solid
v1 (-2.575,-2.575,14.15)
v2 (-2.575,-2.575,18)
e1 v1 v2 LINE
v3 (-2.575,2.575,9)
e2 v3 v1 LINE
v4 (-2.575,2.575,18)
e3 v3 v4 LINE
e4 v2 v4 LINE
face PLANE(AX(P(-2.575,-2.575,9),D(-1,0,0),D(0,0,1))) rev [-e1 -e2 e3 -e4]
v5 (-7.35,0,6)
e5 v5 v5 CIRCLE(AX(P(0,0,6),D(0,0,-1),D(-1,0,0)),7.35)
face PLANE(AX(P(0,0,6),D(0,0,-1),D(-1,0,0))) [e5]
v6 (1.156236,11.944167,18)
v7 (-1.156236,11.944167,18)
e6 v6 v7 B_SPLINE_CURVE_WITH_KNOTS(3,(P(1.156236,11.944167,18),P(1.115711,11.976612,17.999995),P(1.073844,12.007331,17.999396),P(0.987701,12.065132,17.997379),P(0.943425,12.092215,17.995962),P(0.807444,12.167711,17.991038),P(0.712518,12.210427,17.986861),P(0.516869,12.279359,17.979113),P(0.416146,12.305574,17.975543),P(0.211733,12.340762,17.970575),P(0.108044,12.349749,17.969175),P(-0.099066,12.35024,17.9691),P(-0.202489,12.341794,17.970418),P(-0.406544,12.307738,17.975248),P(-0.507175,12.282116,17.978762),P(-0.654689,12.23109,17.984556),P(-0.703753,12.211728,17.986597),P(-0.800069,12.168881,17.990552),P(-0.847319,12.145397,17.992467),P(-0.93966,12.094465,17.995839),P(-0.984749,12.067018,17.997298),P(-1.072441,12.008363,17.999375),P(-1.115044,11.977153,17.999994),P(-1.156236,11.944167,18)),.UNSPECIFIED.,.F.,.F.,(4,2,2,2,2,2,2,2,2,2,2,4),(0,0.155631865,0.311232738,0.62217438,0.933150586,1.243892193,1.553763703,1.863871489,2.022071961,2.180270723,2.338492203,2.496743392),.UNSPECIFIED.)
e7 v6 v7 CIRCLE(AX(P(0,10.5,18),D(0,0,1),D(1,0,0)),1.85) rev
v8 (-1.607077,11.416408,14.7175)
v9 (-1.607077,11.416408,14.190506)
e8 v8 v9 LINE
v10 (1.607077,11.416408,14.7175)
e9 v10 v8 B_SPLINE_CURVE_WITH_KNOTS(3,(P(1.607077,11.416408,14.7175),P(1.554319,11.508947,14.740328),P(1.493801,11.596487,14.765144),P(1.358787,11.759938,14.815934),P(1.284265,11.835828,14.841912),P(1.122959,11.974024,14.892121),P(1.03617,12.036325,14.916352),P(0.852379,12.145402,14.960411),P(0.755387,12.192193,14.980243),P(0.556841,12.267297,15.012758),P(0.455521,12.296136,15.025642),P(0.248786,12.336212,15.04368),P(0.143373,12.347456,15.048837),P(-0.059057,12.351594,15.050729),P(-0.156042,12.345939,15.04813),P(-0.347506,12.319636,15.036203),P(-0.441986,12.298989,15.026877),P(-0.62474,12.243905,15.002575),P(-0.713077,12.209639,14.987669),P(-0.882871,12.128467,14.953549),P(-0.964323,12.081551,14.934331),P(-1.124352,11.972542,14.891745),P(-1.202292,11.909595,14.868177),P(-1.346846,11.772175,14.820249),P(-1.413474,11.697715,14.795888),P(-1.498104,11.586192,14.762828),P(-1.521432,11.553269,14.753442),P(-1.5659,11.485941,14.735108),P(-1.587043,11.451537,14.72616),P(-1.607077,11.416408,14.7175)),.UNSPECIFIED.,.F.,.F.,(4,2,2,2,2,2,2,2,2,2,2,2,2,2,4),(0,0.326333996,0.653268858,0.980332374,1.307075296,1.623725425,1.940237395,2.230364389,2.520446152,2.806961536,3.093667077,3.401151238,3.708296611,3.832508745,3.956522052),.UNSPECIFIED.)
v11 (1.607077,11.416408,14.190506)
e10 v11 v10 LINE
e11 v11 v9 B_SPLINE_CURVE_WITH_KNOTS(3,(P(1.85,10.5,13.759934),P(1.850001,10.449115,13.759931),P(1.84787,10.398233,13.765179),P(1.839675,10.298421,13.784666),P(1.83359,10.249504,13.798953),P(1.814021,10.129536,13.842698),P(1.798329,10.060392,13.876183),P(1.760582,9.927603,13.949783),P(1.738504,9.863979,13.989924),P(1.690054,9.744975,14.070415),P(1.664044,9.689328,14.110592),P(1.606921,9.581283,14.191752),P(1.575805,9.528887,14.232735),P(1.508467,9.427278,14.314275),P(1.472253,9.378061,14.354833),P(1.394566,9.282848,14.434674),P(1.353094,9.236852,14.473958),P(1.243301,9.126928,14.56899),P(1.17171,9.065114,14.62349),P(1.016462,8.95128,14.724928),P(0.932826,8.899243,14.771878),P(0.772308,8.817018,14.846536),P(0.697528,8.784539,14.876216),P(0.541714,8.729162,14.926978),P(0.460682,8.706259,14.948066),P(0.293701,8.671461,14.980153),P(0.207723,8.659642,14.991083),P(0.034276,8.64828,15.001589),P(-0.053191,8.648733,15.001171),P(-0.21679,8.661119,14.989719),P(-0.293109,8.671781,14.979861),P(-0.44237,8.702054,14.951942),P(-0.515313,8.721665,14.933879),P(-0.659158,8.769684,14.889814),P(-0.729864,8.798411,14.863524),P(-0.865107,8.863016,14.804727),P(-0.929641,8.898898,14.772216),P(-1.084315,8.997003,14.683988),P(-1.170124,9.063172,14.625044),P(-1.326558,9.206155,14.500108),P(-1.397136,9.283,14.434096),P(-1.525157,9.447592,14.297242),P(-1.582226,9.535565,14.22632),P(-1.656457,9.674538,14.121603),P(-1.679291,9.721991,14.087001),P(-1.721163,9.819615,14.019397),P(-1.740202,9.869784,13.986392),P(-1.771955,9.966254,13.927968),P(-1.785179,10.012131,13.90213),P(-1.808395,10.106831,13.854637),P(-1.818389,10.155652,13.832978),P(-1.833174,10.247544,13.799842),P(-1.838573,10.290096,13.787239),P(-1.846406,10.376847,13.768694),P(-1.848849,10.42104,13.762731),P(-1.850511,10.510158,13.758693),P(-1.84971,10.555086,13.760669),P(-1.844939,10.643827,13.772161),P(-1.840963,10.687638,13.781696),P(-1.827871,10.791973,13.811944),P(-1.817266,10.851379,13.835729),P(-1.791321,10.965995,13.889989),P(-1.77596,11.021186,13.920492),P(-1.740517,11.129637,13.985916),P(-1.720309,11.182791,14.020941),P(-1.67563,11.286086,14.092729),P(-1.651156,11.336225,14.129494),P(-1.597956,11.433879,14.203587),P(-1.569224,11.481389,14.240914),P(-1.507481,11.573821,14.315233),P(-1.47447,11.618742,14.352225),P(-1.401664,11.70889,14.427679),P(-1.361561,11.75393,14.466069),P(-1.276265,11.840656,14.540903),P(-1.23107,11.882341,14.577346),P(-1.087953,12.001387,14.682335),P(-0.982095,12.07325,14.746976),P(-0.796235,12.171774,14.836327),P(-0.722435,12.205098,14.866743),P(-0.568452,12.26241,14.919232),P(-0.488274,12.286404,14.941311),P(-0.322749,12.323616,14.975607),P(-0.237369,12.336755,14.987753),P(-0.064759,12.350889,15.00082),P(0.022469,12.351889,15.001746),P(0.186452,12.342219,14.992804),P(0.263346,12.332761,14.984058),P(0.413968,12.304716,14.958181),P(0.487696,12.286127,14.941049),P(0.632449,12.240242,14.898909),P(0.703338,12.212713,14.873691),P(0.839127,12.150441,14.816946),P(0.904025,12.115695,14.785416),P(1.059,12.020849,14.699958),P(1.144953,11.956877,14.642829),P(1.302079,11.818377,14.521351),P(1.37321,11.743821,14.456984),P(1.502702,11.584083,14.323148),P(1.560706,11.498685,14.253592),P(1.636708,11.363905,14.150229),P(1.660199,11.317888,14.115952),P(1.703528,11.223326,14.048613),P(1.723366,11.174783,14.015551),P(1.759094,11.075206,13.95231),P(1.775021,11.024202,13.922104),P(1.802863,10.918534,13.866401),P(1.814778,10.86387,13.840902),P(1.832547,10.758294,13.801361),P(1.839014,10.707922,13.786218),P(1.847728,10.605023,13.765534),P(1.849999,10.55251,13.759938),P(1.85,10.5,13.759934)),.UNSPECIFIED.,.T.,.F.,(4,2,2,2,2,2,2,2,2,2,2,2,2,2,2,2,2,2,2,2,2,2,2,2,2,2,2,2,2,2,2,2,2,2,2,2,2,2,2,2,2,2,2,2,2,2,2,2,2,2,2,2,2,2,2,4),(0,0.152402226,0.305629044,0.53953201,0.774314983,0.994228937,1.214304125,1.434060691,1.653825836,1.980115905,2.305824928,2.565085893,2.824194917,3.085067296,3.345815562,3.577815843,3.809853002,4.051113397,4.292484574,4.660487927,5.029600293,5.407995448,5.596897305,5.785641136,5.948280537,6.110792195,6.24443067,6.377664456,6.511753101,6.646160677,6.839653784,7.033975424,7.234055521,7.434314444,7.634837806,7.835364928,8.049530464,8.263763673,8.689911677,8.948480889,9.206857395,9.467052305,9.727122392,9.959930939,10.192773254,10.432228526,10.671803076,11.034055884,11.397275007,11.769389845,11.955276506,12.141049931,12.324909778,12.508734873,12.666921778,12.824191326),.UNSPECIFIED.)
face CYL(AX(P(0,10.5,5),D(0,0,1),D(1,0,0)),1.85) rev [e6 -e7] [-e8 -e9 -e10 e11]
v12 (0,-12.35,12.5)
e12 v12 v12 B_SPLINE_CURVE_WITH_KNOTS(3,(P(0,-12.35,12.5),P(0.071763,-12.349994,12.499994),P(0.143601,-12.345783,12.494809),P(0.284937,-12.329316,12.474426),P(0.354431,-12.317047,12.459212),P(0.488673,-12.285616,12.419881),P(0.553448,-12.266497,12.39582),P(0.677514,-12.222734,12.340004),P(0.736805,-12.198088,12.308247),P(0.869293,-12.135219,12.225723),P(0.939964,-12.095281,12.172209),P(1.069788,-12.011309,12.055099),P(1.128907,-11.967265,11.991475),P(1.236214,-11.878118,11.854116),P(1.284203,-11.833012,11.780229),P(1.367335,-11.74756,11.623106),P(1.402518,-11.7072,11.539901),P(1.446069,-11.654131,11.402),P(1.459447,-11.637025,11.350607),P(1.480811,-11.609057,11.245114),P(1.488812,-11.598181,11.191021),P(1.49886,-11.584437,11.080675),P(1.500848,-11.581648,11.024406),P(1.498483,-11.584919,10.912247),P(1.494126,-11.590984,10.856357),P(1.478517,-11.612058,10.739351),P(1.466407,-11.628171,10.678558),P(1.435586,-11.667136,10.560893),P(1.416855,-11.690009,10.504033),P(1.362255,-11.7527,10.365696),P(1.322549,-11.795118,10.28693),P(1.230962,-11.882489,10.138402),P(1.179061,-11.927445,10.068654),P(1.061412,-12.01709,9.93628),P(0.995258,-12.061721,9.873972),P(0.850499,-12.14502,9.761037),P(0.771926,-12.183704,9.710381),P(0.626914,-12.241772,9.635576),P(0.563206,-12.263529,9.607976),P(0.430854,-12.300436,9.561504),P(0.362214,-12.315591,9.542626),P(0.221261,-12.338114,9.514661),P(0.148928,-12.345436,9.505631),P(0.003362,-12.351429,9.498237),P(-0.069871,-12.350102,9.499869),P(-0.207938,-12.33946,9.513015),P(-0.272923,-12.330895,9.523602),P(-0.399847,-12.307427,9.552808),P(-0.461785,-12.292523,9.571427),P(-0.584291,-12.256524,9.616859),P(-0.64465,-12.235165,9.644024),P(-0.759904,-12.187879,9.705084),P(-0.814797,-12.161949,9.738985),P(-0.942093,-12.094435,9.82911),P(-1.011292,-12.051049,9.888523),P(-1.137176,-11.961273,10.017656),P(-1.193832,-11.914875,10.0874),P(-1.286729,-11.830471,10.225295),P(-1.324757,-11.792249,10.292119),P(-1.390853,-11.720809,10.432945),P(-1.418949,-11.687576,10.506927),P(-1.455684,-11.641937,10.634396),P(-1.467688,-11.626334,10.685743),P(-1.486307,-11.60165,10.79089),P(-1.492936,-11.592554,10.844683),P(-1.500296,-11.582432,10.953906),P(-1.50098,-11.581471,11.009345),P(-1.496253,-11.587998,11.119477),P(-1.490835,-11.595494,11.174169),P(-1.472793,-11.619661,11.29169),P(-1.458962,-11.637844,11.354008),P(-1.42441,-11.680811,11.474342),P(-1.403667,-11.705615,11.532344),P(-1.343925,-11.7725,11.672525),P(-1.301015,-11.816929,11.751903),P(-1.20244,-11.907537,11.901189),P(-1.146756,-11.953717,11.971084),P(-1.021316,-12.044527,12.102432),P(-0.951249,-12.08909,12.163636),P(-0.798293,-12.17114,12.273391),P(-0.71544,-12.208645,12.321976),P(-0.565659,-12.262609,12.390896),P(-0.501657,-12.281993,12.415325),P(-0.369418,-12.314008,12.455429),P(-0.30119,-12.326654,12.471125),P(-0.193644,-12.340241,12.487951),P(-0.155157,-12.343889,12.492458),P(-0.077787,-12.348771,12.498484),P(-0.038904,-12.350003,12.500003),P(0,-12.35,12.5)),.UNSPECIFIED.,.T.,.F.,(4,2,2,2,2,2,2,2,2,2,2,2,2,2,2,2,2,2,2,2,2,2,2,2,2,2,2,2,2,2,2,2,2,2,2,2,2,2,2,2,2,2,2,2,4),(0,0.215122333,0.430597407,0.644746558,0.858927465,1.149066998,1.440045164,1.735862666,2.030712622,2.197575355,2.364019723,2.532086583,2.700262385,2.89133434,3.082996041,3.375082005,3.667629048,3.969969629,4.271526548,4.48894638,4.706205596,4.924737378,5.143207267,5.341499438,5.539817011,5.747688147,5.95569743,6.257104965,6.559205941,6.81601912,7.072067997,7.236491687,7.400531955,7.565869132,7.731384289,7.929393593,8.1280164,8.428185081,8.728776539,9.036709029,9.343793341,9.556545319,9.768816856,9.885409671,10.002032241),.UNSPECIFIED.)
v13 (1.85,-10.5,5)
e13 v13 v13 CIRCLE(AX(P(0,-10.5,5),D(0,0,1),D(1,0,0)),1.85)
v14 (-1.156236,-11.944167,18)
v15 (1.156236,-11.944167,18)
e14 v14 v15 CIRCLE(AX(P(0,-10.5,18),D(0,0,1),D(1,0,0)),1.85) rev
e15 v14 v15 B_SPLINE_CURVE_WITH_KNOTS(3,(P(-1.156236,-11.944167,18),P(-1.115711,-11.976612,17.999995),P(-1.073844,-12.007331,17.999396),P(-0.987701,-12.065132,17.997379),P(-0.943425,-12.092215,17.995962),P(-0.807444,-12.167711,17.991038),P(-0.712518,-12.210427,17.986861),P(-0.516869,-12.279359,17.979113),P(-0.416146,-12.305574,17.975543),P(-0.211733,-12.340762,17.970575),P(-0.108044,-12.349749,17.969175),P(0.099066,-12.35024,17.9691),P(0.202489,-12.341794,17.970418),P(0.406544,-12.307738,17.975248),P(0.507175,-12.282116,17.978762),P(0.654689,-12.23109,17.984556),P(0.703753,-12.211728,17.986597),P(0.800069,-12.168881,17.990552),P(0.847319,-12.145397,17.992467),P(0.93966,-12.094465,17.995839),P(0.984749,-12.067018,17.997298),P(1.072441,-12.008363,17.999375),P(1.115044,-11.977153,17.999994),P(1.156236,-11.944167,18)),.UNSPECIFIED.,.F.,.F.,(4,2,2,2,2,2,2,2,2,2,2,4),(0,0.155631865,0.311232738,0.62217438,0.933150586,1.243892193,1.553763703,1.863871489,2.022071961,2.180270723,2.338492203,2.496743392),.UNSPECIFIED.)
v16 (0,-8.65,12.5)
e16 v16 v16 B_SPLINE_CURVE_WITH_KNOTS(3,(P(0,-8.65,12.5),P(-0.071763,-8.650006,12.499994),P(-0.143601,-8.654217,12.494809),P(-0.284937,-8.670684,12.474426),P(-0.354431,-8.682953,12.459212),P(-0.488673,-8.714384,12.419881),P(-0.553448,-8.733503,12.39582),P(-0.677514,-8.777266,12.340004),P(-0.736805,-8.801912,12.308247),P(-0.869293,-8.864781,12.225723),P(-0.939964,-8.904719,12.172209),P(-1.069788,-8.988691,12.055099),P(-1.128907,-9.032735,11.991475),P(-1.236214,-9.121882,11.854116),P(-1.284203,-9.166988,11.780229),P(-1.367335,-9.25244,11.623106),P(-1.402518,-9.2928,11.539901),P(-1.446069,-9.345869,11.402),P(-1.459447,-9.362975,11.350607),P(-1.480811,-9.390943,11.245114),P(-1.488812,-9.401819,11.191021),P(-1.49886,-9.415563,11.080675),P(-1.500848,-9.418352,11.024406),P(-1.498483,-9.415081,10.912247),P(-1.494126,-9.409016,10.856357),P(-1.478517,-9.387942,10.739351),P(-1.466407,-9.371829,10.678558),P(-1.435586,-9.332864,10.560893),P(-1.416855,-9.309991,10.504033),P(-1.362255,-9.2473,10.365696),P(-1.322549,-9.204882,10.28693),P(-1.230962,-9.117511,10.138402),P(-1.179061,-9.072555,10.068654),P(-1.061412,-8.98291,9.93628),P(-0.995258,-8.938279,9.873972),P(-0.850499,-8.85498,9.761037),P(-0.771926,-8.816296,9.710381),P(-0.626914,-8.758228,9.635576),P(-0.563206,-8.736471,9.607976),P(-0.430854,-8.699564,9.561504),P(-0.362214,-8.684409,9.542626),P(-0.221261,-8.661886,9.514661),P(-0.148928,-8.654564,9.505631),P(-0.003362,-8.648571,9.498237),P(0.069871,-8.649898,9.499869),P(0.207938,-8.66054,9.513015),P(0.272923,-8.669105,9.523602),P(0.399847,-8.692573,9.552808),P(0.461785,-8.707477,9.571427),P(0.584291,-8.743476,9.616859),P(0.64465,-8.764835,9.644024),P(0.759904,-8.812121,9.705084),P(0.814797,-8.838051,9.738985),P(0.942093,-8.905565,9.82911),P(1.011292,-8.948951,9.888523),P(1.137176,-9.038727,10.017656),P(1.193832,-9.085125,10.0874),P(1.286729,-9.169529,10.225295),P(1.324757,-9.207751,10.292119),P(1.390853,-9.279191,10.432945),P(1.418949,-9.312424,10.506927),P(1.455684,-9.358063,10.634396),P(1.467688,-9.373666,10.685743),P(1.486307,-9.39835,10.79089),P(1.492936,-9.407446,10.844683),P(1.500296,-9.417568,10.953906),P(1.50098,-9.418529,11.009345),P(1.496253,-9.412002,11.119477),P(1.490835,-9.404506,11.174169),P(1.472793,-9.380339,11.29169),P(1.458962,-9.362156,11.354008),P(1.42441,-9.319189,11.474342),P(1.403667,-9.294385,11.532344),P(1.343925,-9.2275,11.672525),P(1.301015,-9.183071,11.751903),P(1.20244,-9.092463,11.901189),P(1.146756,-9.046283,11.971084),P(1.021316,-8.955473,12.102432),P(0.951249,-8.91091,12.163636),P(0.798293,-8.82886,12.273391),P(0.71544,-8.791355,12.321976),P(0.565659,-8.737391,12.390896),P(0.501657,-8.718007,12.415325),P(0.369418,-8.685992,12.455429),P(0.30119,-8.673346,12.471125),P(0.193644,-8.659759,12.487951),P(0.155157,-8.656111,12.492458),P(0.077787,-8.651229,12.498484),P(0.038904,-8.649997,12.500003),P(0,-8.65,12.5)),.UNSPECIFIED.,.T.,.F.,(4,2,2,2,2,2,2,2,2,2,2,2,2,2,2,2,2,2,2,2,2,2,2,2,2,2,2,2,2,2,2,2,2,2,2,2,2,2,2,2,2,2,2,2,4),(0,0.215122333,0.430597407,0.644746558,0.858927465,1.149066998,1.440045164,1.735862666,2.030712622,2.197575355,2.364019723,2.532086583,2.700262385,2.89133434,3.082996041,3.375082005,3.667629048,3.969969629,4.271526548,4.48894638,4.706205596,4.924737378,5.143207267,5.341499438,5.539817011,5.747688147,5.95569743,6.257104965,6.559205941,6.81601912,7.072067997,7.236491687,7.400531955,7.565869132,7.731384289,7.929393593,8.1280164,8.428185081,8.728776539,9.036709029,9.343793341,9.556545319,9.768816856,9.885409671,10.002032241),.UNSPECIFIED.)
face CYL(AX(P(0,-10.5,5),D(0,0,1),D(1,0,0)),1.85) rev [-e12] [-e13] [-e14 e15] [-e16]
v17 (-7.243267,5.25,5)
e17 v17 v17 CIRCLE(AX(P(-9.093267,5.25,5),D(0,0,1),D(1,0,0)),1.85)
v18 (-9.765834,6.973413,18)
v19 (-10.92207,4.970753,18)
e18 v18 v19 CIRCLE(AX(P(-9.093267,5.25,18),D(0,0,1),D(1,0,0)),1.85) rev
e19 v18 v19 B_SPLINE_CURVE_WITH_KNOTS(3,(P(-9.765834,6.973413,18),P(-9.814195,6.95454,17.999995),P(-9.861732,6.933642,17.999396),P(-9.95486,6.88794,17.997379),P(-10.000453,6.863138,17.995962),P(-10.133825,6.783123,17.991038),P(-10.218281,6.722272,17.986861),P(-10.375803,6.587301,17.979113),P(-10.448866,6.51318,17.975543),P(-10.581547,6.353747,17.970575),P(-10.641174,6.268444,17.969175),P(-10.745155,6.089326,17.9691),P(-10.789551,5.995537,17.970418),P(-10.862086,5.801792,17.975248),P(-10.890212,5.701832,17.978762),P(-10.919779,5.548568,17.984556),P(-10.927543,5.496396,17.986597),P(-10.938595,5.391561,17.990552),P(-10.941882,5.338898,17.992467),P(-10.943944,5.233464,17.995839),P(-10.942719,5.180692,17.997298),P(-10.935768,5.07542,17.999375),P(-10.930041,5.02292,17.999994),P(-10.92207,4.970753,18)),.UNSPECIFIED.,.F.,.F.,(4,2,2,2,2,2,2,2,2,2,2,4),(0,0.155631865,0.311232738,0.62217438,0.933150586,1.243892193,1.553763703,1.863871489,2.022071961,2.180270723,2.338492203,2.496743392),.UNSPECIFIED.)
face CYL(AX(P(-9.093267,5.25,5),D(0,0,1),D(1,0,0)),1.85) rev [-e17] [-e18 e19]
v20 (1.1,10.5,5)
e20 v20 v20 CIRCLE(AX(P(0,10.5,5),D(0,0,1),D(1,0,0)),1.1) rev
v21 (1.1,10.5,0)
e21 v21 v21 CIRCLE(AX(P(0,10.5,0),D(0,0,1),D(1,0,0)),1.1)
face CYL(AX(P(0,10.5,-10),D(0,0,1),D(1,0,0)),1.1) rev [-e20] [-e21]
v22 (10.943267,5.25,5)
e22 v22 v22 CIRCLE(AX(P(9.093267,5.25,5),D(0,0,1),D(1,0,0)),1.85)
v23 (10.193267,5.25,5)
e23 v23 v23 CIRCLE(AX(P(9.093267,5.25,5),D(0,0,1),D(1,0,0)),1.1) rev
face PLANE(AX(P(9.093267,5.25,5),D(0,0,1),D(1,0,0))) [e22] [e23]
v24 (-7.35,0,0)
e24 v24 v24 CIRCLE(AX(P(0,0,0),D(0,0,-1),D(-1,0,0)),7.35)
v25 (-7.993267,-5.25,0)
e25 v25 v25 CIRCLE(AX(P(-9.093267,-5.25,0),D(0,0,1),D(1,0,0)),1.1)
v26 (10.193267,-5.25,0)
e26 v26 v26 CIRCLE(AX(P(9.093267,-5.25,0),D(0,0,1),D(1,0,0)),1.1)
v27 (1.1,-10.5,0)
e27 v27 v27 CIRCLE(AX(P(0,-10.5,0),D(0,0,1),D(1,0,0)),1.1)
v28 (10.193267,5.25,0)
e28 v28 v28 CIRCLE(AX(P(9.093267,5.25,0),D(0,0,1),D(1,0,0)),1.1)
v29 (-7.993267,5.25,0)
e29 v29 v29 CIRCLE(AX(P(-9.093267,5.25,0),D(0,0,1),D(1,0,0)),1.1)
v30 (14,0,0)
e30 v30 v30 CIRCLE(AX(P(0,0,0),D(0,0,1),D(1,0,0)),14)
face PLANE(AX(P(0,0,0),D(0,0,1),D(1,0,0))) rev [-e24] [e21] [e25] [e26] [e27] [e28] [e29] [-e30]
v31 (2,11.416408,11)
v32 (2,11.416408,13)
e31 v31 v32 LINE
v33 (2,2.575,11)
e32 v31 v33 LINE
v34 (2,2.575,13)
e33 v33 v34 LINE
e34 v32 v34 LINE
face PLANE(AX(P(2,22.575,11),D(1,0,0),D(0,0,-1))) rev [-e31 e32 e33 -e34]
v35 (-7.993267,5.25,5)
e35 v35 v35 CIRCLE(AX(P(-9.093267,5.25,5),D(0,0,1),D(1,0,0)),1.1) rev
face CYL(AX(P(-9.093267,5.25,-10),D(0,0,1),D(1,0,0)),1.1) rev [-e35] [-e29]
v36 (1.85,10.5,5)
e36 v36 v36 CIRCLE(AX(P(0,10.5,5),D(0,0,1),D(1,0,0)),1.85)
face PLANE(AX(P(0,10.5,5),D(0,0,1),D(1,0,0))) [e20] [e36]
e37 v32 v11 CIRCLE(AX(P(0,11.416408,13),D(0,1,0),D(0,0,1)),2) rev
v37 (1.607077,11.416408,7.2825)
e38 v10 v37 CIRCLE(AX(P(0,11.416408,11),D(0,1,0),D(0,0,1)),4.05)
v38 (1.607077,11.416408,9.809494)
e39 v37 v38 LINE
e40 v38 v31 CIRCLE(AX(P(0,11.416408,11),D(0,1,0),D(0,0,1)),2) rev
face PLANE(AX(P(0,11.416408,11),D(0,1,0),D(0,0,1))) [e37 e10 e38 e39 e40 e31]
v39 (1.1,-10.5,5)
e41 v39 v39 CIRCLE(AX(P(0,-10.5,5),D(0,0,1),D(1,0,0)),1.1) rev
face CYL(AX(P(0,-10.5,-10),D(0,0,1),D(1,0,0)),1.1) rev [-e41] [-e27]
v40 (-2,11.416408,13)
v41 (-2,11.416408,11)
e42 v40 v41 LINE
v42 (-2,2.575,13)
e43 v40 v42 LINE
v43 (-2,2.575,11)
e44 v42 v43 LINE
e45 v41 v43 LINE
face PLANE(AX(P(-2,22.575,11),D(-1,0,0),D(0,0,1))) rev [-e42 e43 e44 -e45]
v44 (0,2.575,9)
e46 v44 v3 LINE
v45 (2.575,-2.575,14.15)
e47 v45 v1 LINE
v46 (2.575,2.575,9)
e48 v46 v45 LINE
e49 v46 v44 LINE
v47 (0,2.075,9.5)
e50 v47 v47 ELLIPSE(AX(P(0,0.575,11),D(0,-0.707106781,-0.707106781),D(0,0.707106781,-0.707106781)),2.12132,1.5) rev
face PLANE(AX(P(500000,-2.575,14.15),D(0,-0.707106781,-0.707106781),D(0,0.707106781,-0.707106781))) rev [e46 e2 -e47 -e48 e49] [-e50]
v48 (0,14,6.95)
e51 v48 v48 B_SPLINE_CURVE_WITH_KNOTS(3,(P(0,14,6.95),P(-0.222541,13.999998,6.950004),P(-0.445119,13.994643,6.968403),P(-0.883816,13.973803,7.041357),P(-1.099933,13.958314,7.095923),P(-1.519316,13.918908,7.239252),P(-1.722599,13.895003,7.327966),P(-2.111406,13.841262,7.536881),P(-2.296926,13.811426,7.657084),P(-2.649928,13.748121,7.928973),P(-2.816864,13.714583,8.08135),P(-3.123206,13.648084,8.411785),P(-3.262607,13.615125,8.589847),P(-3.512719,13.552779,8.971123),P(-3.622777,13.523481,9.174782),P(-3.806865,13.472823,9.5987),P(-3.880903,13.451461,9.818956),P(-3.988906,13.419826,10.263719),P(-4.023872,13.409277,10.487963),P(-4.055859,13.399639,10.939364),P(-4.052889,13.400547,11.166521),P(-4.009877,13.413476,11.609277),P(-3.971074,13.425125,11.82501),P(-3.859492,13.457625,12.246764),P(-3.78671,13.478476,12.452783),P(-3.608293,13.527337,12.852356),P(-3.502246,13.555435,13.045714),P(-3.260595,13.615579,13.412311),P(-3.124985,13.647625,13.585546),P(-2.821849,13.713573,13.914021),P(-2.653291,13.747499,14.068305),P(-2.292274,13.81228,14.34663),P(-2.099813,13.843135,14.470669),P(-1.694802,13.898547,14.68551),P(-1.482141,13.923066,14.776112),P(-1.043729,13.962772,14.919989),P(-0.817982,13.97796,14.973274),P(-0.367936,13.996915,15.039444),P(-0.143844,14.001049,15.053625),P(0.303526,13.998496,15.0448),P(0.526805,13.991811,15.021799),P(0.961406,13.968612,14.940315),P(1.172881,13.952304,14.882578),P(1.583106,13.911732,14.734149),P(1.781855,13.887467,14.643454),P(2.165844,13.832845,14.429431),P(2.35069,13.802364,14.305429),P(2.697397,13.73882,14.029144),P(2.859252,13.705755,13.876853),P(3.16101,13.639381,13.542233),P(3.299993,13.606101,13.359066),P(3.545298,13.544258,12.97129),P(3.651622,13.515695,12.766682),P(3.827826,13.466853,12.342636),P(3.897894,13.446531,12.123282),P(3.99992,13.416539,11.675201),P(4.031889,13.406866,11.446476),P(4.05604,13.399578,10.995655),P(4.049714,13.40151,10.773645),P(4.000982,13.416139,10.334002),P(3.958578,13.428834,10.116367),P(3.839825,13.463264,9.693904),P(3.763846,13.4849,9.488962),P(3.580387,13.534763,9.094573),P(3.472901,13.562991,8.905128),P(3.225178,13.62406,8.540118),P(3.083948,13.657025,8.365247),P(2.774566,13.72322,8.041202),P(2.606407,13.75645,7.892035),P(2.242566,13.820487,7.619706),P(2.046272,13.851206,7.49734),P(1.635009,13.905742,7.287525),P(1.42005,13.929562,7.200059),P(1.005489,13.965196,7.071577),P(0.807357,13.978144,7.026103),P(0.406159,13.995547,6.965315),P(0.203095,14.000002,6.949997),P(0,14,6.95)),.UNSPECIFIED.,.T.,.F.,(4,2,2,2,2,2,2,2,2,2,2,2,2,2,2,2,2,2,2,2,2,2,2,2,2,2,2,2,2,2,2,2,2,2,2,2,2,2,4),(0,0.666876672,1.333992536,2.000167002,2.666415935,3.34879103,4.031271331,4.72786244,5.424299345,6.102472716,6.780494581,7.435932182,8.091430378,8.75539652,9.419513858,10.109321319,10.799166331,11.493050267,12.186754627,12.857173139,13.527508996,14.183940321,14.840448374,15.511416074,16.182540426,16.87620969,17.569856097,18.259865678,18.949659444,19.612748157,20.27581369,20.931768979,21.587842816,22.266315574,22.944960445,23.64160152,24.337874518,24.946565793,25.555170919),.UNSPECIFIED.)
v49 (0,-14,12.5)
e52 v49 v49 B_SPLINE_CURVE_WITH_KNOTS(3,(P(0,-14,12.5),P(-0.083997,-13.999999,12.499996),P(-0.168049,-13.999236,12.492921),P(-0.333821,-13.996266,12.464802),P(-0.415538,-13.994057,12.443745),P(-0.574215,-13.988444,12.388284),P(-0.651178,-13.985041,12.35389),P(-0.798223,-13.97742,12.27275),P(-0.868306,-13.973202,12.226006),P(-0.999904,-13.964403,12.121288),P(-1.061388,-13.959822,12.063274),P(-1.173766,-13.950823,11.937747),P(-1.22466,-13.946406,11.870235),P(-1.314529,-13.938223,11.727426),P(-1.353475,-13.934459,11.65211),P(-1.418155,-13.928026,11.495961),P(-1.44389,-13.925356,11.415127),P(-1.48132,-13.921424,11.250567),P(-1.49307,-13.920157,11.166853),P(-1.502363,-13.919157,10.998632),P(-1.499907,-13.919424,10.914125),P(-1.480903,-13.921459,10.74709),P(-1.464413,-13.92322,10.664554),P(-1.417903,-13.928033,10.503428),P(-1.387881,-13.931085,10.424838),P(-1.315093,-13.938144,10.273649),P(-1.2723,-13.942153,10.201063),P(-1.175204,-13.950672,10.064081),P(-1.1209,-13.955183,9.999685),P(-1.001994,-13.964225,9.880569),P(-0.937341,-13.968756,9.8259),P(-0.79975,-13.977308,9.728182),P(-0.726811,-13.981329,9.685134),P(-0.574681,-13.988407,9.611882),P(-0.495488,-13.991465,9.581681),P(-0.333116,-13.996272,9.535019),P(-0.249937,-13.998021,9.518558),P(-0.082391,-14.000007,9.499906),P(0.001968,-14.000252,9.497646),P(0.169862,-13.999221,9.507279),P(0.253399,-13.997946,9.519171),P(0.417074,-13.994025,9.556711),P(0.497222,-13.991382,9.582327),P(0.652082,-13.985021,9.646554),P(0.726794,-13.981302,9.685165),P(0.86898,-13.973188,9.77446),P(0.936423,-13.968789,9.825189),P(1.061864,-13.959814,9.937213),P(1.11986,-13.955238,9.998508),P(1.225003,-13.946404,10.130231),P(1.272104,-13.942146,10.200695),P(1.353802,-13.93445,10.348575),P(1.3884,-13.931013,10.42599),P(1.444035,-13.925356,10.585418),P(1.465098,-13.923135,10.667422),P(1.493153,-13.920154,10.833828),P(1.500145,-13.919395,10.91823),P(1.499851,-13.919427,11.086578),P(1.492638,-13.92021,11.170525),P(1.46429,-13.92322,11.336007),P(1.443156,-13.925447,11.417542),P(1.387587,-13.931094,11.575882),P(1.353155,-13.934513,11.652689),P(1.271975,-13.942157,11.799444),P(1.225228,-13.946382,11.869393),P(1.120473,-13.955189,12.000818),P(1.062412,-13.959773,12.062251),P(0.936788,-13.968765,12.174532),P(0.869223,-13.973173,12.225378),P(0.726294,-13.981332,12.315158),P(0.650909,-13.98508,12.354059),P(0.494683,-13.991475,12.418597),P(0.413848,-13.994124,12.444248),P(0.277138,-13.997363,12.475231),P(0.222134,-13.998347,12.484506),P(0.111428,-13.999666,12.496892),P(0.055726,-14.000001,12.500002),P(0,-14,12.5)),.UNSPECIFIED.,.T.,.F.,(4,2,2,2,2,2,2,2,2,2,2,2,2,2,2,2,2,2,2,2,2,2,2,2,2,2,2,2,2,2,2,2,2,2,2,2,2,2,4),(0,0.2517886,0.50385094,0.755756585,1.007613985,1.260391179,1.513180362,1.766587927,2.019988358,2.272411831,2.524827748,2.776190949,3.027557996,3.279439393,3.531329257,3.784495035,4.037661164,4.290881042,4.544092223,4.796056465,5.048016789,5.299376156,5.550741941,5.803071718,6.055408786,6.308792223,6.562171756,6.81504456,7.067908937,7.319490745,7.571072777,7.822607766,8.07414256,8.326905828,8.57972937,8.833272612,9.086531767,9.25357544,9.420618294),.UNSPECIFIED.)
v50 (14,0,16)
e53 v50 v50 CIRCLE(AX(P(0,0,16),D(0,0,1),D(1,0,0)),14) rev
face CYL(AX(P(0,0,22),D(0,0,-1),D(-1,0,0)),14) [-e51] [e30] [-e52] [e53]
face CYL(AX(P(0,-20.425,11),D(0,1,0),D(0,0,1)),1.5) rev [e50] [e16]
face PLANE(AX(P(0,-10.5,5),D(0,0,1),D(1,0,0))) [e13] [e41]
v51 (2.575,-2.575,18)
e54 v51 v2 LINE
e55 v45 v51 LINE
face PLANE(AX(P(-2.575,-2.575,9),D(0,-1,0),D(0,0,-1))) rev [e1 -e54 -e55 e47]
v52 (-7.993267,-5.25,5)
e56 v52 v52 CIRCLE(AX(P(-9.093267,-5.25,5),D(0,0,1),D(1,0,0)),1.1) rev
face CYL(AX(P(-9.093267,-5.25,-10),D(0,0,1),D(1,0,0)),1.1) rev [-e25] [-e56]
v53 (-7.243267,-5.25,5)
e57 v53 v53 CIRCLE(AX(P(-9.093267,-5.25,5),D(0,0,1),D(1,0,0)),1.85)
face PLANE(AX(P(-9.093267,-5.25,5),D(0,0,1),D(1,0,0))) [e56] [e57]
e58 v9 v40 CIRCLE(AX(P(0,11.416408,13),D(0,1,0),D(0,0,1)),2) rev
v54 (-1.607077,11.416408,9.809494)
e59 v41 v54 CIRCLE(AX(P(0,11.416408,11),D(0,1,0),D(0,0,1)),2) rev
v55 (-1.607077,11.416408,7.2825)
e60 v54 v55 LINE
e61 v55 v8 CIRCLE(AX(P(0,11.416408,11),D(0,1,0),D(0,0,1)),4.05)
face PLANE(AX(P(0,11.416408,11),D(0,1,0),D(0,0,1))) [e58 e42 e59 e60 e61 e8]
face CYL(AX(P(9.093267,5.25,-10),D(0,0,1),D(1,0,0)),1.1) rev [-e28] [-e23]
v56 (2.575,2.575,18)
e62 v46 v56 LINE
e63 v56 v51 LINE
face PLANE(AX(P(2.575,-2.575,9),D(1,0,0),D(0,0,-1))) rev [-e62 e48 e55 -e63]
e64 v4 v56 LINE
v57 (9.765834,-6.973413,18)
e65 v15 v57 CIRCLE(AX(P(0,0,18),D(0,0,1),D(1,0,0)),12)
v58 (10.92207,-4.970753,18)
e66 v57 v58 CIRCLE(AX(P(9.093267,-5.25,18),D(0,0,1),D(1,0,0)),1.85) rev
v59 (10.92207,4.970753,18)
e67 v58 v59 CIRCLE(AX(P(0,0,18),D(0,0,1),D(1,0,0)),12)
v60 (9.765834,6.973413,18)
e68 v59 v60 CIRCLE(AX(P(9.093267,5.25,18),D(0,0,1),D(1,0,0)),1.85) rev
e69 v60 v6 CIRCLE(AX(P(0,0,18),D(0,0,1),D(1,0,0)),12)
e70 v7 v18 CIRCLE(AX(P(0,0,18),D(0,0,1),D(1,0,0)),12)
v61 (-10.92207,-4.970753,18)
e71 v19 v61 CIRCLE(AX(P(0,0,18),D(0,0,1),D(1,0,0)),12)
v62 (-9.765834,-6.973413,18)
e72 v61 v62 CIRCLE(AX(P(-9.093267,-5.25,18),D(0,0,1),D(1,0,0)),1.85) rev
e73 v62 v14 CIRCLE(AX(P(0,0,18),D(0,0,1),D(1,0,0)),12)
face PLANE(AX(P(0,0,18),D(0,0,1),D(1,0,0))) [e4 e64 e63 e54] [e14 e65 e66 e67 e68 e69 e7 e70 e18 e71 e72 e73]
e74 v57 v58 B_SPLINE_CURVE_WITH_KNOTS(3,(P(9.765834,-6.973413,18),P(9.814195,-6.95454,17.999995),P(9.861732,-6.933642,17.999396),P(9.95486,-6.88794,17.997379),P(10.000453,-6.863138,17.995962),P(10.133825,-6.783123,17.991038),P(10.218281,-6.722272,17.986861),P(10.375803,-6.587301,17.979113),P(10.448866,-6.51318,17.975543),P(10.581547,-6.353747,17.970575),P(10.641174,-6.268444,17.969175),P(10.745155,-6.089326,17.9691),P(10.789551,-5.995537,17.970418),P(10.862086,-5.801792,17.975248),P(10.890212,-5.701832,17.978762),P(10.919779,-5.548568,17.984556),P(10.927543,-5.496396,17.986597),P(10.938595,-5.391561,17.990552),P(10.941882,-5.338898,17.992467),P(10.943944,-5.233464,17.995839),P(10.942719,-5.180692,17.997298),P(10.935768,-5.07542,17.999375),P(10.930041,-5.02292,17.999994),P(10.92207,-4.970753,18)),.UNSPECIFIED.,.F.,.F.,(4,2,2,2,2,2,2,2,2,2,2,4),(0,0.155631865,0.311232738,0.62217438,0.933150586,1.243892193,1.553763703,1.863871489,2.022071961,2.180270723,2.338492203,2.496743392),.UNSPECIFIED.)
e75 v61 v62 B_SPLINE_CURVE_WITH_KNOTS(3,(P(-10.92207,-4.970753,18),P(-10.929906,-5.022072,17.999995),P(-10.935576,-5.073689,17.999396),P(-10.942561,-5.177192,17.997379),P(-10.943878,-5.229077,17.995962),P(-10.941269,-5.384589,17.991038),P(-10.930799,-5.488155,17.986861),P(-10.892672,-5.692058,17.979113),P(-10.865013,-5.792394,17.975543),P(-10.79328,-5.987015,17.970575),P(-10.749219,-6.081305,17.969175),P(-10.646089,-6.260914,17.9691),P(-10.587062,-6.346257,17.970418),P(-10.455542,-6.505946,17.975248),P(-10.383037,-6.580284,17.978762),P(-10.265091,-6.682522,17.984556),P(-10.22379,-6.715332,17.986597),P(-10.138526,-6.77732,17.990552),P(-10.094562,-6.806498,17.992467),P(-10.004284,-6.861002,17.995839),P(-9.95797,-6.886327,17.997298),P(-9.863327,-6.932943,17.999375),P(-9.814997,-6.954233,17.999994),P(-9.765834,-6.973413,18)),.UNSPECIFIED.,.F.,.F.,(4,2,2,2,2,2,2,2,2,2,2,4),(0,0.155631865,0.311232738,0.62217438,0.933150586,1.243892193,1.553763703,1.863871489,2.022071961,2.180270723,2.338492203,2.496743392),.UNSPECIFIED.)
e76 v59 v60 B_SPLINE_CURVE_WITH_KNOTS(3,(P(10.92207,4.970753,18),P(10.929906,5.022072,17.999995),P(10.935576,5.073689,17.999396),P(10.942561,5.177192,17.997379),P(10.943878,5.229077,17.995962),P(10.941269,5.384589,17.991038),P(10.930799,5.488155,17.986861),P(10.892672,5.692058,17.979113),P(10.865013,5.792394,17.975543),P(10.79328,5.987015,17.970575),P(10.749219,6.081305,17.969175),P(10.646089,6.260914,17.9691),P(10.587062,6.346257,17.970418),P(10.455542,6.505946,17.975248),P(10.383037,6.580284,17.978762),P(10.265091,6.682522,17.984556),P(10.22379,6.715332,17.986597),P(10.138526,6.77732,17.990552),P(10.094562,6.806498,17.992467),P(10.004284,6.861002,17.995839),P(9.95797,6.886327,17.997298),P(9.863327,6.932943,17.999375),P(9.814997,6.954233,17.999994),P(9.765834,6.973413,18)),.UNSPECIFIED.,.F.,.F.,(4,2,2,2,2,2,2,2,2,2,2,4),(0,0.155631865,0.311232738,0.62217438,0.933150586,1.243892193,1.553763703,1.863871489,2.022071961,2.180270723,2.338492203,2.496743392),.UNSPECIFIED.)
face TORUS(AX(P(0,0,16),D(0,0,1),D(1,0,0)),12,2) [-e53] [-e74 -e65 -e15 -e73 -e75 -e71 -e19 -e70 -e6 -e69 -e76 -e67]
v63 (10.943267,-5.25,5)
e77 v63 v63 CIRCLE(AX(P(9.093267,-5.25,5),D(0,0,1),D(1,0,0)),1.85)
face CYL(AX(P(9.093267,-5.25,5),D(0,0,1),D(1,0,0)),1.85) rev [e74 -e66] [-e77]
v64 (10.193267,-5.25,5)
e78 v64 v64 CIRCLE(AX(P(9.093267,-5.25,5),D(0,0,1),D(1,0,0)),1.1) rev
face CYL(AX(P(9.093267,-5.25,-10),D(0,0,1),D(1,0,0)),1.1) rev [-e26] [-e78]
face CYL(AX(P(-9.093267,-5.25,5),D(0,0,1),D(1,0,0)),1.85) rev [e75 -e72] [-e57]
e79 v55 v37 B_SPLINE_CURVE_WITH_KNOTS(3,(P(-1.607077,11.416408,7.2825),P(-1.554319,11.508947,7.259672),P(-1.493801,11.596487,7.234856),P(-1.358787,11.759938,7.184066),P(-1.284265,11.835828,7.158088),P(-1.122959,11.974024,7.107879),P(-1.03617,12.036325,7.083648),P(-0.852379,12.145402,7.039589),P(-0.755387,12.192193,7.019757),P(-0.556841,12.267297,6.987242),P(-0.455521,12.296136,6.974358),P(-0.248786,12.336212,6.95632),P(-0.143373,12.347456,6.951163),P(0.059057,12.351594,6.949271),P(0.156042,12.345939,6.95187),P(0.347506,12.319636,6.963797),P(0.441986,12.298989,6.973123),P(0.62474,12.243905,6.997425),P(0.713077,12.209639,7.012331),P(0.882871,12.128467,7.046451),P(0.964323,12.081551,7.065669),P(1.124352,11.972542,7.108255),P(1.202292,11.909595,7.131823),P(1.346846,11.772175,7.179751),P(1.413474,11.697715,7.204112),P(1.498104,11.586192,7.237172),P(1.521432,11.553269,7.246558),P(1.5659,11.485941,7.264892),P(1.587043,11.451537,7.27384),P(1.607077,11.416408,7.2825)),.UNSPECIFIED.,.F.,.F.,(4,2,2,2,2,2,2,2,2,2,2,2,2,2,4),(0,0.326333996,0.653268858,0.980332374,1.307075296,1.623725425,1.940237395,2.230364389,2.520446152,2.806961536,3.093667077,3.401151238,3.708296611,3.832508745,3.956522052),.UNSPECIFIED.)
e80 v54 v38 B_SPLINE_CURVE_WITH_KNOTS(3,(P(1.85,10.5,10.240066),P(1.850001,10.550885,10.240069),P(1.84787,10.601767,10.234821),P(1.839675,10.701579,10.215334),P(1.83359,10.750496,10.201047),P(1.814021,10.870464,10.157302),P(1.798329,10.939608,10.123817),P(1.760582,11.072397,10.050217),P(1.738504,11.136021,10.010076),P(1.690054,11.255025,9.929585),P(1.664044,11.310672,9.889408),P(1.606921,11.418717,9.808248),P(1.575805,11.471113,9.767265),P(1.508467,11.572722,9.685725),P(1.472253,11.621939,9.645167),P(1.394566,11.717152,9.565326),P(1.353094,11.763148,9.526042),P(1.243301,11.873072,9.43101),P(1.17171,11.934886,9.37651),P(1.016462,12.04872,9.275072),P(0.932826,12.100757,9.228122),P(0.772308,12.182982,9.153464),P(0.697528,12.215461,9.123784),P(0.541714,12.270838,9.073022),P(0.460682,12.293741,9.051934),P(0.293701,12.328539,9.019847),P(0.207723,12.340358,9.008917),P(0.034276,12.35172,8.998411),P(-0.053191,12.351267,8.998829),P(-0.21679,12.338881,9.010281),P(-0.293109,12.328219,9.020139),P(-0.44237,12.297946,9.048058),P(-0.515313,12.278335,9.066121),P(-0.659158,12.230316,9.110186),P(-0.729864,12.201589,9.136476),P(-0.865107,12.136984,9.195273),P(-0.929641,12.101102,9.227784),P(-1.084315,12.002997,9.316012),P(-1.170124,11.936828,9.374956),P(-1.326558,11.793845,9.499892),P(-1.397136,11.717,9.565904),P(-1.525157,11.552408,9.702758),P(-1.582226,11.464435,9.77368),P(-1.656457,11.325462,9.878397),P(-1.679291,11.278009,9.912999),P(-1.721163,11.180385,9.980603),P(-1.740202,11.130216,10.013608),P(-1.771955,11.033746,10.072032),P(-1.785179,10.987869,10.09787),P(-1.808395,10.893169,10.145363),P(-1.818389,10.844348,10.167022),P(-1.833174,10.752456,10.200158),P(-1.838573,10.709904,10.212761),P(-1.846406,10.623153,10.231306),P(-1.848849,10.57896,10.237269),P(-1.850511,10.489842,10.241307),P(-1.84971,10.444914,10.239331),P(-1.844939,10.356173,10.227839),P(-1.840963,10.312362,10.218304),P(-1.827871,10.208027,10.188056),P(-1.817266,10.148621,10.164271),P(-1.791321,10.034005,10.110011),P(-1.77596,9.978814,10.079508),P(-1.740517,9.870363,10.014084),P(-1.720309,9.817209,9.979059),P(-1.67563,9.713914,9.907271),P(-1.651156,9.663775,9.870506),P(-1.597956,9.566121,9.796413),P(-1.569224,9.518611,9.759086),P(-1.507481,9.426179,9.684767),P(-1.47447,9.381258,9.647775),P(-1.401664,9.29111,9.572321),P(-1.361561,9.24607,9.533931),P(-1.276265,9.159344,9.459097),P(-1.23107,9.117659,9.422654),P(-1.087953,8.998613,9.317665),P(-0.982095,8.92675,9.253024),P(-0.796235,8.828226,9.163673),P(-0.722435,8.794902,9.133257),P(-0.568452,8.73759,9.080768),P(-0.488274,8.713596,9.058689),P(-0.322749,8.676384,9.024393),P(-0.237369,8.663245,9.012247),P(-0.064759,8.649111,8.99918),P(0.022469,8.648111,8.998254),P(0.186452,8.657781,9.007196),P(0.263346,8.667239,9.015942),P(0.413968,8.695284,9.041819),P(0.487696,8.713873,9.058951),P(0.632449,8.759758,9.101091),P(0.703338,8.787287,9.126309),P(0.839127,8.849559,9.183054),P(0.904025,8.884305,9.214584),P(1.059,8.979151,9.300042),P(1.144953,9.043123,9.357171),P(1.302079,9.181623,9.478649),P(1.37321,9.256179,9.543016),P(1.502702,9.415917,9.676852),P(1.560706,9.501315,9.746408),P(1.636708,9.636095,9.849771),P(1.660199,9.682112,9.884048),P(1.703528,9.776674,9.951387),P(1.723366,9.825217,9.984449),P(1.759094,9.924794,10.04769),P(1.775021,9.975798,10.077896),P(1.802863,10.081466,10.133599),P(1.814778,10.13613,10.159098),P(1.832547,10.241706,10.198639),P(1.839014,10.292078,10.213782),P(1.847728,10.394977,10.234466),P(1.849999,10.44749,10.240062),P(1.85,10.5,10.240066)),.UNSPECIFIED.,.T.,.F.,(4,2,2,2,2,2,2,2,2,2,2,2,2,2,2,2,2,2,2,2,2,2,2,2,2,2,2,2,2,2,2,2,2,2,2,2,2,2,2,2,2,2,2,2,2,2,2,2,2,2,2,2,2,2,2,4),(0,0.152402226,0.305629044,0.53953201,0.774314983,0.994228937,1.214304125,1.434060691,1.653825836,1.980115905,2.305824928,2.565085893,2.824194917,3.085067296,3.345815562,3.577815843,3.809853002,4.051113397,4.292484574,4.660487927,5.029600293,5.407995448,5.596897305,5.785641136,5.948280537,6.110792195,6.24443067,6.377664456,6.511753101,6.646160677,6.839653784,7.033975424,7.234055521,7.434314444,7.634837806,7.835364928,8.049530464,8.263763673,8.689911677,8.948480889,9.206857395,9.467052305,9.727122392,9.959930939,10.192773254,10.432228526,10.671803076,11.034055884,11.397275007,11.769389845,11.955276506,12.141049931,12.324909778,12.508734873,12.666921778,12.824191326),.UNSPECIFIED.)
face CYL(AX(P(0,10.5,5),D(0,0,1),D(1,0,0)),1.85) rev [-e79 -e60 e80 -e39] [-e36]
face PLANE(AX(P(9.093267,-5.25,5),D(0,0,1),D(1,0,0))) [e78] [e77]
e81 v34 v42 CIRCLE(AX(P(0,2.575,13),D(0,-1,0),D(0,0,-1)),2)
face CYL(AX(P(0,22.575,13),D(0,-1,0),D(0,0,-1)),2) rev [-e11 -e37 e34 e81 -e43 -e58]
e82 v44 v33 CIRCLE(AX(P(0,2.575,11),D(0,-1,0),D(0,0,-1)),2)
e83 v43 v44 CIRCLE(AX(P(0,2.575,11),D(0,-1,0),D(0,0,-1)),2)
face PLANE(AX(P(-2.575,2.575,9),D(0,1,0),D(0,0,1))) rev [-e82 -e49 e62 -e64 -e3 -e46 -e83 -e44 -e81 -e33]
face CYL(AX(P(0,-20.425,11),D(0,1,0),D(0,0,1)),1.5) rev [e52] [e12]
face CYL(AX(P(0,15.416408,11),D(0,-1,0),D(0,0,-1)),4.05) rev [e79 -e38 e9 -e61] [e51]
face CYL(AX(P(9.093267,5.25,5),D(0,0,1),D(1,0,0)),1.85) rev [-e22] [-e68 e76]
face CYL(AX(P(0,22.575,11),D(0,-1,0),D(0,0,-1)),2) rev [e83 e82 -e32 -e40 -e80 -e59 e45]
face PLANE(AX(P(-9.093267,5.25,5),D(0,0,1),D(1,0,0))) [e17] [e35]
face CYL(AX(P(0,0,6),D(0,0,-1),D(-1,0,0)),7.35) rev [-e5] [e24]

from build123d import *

# Parameters (mm, degrees)
SKETCH_1_R           = 14
EXTRUDE_1_DEPTH      = 22
SKETCH_3_R           = 7.35
CUT_EXTRUDE_1_DEPTH  = 6
SKETCH_2_R           = 1.1
CUT_EXTRUDE_2_DEPTH  = 32
SKETCH_4_R           = 1.85
CUT_EXTRUDE_3_DEPTH  = 17
SKETCH_5_W           = 5.15
SKETCH_5_H           = 5.15
CUT_EXTRUDE_4_DEPTH  = 13
EXTRUDE_2_REACH      = 32.899
CUT_EXTRUDE_7_DEPTH  = 20
SKETCH_11_R          = 4.05
CUT_EXTRUDE_8_DEPTH  = 2
SKETCH_12_R          = 19.208398283
CUT_EXTRUDE_9_DEPTH  = 4
SKETCH_13_R          = 1.5
CUT_EXTRUDE_10_DEPTH = 23
FILLET_1_R           = 2


with BuildPart() as part:
    # 草图1 → 凸台-拉伸1 (new body)
    with BuildSketch(Plane.XY):
        Circle(SKETCH_1_R)
    extrude(amount=EXTRUDE_1_DEPTH)

    # 草图3 → 切除-拉伸1 (cut)
    with BuildSketch(Plane(origin=(0, 0, 0), x_dir=(-1, 0, 0), z_dir=(0, 0, -1))):
        Circle(SKETCH_3_R)
    extrude(amount=-CUT_EXTRUDE_1_DEPTH, mode=Mode.SUBTRACT)

    # 草图2 → 切除-拉伸2 (cut)
    with BuildSketch(Plane.XY.offset(22)):
        with Locations((-9.09326674, -5.25)):
            Circle(SKETCH_2_R)
        with Locations((-9.09326674, 5.25)):
            Circle(SKETCH_2_R)
        with Locations((0, 10.5)):
            Circle(SKETCH_2_R)
        with Locations((9.09326674, 5.25)):
            Circle(SKETCH_2_R)
        with Locations((9.09326674, -5.25)):
            Circle(SKETCH_2_R)
        with Locations((0, -10.5)):
            Circle(SKETCH_2_R)
    extrude(amount=-CUT_EXTRUDE_2_DEPTH, mode=Mode.SUBTRACT)

    # 草图4 → 切除-拉伸3 (cut)
    with BuildSketch(Plane.XY.offset(22)):
        with Locations((9.09326674, 5.25)):
            Circle(SKETCH_4_R)
        with Locations((9.09326674, -5.25)):
            Circle(SKETCH_4_R)
        with Locations((0, -10.5)):
            Circle(SKETCH_4_R)
        with Locations((-9.09326674, -5.25)):
            Circle(SKETCH_4_R)
        with Locations((-9.09326674, 5.25)):
            Circle(SKETCH_4_R)
        with Locations((0, 10.5)):
            Circle(SKETCH_4_R)
    extrude(amount=-CUT_EXTRUDE_3_DEPTH, mode=Mode.SUBTRACT)

    # 草图5 → 切除-拉伸4 (cut)
    with BuildSketch(Plane.XY.offset(22)):
        Rectangle(SKETCH_5_W, SKETCH_5_H)
    extrude(amount=-CUT_EXTRUDE_4_DEPTH, mode=Mode.SUBTRACT)

    # 草图6 → 凸台-拉伸2 (add, up to next)
    with BuildSketch(Plane(origin=(-2.575, 0, 0), x_dir=(0, 0, -1), z_dir=(1, 0, 0)), mode=Mode.PRIVATE) as extrude_2_sk1:
        Polygon((-9, -2.575), (-14.15, -2.575), (-9, 2.575), align=None)
    extrude_2_tool1 = extrude(extrude_2_sk1.sketch, amount=EXTRUDE_2_REACH, mode=Mode.PRIVATE) - part.part
    add(extrude_2_tool1.solids().sort_by_distance((-2.575, -0.858333, 10.716667))[0])

    # 草图9 → 切除-拉伸7 (cut)
    with BuildSketch(Plane(origin=(0, 2.575, 0), x_dir=(-1, 0, 0), z_dir=(0, -1, 0))):
        with BuildLine():
            Line((2, -11), (2, -13))
            ThreePointArc((2, -13), (0, -15), (-2, -13))
            Line((-2, -13), (-2, -11))
            ThreePointArc((-2, -11), (0, -9), (2, -11))
        make_face()
    extrude(amount=-CUT_EXTRUDE_7_DEPTH, mode=Mode.SUBTRACT)

    # 草图11 → 切除-拉伸8 (cut, symmetric)
    with BuildSketch(Plane(origin=(0, 13.416407865, 0), x_dir=(1, 0, 0), z_dir=(0, 1, 0))):
        with Locations(Location((0, -11, 0), (0, 0, 90))):
            Circle(SKETCH_11_R)
    extrude(amount=CUT_EXTRUDE_8_DEPTH, both=True, mode=Mode.SUBTRACT)

    # 草图12 → 切除-拉伸9 (cut)
    with BuildSketch(Plane.XY.offset(22)):
        Circle(SKETCH_12_R)
    extrude(amount=-CUT_EXTRUDE_9_DEPTH, mode=Mode.SUBTRACT)

    # 草图13 → 切除-拉伸10 (cut)
    with BuildSketch(Plane(origin=(0, 2.575, 0), x_dir=(-1, 0, 0), z_dir=(0, -1, 0))):
        with Locations(Location((0, -11, 0), (0, 0, 270))):
            Circle(SKETCH_13_R)
    extrude(amount=CUT_EXTRUDE_10_DEPTH, mode=Mode.SUBTRACT)

    # 圆角1
    # the kernel refuses this fillet: 2 mm, written as the material it takes off along each edge
    with BuildSketch(Plane(origin=(0, 0, 18), x_dir=(1, 0, 0), z_dir=(0, 1, 0))) as fillet_1_piece_1:
        with BuildLine():
            CenterArc((14 - FILLET_1_R, FILLET_1_R), FILLET_1_R, 270, 90)
            Line((14, FILLET_1_R), (14, 0))
            Line((14, 0), (14 - FILLET_1_R, 0))
        make_face()
    revolve(axis=Axis((0, 0, 18), (0, 0, -1)), mode=Mode.SUBTRACT)


solid = part.part
